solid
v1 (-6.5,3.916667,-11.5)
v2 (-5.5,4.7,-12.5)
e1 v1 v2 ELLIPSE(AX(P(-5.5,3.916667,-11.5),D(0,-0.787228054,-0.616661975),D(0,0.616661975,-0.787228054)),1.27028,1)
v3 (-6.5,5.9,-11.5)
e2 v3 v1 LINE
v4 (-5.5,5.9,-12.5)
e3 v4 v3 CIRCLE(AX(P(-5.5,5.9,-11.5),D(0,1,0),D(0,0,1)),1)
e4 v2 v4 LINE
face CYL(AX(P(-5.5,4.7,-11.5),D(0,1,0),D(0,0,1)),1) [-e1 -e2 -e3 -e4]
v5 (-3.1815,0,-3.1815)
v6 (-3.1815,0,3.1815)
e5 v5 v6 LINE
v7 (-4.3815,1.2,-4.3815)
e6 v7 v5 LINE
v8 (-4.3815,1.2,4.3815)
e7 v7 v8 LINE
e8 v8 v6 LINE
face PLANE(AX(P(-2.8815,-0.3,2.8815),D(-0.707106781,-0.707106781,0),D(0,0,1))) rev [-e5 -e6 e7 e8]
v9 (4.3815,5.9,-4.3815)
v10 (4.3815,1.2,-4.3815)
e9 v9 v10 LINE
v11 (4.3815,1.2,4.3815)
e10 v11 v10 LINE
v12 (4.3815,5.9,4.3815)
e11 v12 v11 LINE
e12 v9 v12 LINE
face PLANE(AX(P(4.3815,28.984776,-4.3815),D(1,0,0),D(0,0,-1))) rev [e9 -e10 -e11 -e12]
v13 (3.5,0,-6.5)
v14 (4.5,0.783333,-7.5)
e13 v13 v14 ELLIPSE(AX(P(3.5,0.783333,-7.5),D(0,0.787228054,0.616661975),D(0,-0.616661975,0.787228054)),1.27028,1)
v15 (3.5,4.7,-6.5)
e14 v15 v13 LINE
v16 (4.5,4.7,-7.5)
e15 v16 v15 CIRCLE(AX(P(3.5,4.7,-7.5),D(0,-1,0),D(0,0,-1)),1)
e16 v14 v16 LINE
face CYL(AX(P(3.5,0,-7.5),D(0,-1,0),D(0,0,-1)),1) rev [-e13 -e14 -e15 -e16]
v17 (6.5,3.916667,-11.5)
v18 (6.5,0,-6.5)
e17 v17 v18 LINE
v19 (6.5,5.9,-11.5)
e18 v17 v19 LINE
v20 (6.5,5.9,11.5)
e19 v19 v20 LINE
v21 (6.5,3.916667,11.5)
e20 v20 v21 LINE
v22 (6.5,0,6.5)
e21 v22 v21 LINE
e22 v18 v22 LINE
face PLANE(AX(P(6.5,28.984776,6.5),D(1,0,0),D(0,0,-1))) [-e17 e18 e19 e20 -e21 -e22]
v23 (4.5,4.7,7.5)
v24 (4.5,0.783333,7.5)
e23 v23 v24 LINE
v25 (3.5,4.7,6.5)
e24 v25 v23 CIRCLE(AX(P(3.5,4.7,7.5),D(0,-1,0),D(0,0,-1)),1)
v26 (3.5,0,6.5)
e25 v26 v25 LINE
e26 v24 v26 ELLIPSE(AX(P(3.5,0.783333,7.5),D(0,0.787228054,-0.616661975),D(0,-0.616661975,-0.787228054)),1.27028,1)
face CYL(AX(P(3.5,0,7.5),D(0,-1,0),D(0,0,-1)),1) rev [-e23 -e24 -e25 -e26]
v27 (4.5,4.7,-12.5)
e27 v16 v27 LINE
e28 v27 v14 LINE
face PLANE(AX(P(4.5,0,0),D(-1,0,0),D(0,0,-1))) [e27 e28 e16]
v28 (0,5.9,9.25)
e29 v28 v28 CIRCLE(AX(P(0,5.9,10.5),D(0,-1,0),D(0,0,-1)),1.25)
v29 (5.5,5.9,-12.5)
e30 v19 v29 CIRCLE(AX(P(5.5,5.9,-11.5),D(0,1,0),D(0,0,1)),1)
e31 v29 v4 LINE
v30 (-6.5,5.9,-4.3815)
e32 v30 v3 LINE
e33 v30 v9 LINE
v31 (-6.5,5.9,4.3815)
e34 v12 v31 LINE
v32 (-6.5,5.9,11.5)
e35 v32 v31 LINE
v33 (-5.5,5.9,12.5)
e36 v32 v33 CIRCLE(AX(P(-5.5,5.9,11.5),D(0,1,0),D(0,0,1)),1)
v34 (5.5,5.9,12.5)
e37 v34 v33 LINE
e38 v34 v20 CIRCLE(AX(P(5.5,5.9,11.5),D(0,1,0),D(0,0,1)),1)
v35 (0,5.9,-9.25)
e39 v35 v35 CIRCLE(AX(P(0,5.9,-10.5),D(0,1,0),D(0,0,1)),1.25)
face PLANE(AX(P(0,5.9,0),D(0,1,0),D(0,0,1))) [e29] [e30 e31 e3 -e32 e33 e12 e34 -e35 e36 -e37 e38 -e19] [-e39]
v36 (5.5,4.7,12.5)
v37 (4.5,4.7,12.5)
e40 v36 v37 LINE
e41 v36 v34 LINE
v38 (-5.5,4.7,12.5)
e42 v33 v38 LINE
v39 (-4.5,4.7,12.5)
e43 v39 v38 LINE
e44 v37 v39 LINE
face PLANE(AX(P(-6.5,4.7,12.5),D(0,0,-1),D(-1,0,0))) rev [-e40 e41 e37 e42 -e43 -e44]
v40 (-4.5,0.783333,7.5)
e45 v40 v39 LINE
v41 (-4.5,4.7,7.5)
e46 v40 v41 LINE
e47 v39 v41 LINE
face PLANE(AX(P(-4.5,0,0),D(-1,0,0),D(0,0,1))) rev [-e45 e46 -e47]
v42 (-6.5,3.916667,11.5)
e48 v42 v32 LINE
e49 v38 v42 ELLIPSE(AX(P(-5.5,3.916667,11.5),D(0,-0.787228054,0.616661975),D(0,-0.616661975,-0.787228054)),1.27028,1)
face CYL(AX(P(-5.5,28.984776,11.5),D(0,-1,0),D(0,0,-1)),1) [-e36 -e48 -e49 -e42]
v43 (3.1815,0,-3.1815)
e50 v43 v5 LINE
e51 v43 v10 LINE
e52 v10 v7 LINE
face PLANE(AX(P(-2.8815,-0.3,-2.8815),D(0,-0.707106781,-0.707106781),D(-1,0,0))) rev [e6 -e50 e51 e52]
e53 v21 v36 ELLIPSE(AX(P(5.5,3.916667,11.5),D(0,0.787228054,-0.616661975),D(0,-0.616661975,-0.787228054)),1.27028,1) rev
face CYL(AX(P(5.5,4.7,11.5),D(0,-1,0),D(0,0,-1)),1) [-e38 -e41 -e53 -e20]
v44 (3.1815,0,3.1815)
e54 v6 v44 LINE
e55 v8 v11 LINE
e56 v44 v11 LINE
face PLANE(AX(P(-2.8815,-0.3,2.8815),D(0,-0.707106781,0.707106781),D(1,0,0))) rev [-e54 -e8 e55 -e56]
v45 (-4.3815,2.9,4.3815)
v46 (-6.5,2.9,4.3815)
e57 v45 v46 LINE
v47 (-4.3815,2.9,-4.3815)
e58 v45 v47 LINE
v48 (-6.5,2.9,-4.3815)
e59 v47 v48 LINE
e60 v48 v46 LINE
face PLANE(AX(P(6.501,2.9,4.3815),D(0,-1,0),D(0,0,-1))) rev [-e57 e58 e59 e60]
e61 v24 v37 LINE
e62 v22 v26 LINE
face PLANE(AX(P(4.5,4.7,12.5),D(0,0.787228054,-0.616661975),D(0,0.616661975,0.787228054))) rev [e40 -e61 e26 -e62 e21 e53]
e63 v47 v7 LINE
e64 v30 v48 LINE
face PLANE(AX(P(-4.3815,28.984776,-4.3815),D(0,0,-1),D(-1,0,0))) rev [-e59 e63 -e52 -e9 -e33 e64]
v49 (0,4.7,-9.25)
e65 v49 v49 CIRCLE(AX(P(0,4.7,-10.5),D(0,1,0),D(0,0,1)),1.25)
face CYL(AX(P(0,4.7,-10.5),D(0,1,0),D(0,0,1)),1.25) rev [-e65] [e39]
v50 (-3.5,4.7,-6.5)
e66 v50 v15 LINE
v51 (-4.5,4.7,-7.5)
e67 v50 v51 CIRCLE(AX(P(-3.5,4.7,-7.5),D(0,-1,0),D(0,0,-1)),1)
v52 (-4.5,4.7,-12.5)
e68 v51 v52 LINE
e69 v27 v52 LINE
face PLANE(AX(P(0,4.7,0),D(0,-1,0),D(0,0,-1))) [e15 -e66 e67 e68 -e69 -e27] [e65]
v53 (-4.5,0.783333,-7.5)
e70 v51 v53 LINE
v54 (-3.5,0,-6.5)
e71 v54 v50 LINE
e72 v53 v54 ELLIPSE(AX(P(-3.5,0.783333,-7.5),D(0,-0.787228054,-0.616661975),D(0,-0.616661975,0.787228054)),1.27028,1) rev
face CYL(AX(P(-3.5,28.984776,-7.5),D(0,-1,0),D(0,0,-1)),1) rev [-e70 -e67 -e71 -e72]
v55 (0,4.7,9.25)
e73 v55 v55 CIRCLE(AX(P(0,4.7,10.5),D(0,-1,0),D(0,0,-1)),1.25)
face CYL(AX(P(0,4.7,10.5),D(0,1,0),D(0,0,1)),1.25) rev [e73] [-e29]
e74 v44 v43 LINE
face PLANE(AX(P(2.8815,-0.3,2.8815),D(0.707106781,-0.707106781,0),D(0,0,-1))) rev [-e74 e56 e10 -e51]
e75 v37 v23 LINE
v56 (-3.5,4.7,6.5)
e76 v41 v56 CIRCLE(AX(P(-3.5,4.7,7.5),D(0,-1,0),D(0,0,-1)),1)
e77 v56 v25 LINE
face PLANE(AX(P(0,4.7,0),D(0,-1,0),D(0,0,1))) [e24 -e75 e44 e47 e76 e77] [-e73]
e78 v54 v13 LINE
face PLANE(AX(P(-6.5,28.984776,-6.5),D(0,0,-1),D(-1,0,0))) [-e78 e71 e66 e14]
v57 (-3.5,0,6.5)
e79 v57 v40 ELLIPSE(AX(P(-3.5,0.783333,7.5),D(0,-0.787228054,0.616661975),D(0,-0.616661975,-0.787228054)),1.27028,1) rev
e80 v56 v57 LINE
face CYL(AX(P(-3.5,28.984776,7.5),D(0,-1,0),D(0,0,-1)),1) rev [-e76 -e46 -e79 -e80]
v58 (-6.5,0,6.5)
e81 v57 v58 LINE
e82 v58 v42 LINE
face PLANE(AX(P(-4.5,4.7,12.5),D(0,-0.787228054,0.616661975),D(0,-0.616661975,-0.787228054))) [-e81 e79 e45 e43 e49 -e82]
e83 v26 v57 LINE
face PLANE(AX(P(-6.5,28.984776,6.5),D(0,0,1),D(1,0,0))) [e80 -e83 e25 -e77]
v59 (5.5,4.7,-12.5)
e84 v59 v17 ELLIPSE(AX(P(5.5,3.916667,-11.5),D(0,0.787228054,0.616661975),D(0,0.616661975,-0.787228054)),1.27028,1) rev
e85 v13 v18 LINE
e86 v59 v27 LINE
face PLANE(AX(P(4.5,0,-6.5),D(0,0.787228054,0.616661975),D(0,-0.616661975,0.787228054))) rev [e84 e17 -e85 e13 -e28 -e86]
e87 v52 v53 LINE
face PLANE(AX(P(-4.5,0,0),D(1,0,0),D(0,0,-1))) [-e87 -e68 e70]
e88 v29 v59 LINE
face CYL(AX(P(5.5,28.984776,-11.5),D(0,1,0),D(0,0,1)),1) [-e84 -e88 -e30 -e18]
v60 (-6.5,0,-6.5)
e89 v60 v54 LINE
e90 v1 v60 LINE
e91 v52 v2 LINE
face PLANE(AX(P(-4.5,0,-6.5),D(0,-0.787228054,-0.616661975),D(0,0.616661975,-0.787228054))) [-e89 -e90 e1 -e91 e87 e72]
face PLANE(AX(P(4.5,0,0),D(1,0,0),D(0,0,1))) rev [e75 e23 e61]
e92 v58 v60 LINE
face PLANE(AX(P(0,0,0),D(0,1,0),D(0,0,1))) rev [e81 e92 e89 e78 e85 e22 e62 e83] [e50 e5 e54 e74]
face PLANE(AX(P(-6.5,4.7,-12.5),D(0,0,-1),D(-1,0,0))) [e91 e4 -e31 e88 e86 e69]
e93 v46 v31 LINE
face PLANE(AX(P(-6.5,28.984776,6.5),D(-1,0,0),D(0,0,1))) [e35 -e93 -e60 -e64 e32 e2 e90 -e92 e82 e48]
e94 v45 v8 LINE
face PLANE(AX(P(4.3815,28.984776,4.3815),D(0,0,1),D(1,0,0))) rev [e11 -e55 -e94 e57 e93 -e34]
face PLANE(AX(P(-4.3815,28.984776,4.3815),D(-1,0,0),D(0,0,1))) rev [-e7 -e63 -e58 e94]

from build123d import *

# Parameters (mm, degrees)
SKETCH1_W           = 8.763
SKETCH1_H           = 8.763
SKETCH1_W_2         = 5.763
SKETCH1_H_2         = 5.763
BOSS_EXTRUDE1_DEPTH = 1.2
SKETCH2_W           = 13
SKETCH2_H           = 13
SKETCH2_W_2         = 8.763
SKETCH2_H_2         = 8.763
BOSS_EXTRUDE3_DEPTH = 5.9
CHAMFER1_SIZE       = 1.5
SKETCH3_W           = 13
SKETCH3_H           = 6
SKETCH3_R           = 1.25
BOSS_EXTRUDE4_DEPTH = 1.2
BOSS_EXTRUDE5_DEPTH = 2
FILLET1_R           = 1
CUT_EXTRUDE1_REACH  = 20.975
SKETCH4_W           = 8.763
SKETCH4_H           = 3


with BuildPart() as part:
    # Sketch1 → Boss-Extrude1 (new body)
    with BuildSketch(Plane(origin=(0, 0, 0), x_dir=(1, 0, 0), z_dir=(0, 1, 0))):
        Rectangle(SKETCH1_W, SKETCH1_H)
        Rectangle(SKETCH1_W_2, SKETCH1_H_2, mode=Mode.SUBTRACT)
    extrude(amount=BOSS_EXTRUDE1_DEPTH)

    # Sketch2 → Boss-Extrude3 (add)
    with BuildSketch(Plane.XZ):
        Rectangle(SKETCH2_W, SKETCH2_H)
        Rectangle(SKETCH2_W_2, SKETCH2_H_2, mode=Mode.SUBTRACT)
    extrude(amount=-BOSS_EXTRUDE3_DEPTH)

    # Chamfer1
    # the kernel refuses this chamfer: 1.5 mm, written as the material it takes off along each edge
    with BuildSketch(Plane(origin=(2.8815, 1.2, -2.8815), x_dir=(0, 0.02749587661058634, -0.9996219169112968), z_dir=(-1, 0, 0))) as chamfer1_piece_1_section:
        Polygon((CHAMFER1_SIZE * 0.999621916911, CHAMFER1_SIZE * 0.0274958766106), (-CHAMFER1_SIZE * 0.0274958766106, CHAMFER1_SIZE * 0.999621916911), (0, 0), align=None)
    chamfer1_piece_1 = extrude(amount=5.763, mode=Mode.PRIVATE)
    chamfer1_piece_1 = split(chamfer1_piece_1, bisect_by=Plane(origin=(0, 0.704393769, -4.3815), z_dir=(0, 0, 1)), keep=Keep.TOP, mode=Mode.PRIVATE)
    add(chamfer1_piece_1, mode=Mode.SUBTRACT)
    with BuildSketch(Plane(origin=(2.8815, 1.2, 2.8815), x_dir=(-0.02749587661058649, -0.9996219169112968, 0), z_dir=(0, 0, -1))) as chamfer1_piece_2_section:
        Polygon((CHAMFER1_SIZE * 0.999621916911, -CHAMFER1_SIZE * 0.0274958766106), (-CHAMFER1_SIZE * 0.0274958766106, -CHAMFER1_SIZE * 0.999621916911), (0, 0), align=None)
    chamfer1_piece_2 = extrude(amount=5.763, mode=Mode.PRIVATE)
    chamfer1_piece_2 = split(chamfer1_piece_2, bisect_by=Plane(origin=(4.3815, 0.704393769, 0), z_dir=(-1, 0, 0)), keep=Keep.TOP, mode=Mode.PRIVATE)
    add(chamfer1_piece_2, mode=Mode.SUBTRACT)
    with BuildSketch(Plane(origin=(-2.8815, 1.2, 2.8815), x_dir=(0, -0.9996219169112968, -0.02749587661058649), z_dir=(1, 0, 0))) as chamfer1_piece_3_section:
        Polygon((CHAMFER1_SIZE * 0.999621916911, -CHAMFER1_SIZE * 0.0274958766106), (-CHAMFER1_SIZE * 0.0274958766106, -CHAMFER1_SIZE * 0.999621916911), (0, 0), align=None)
    chamfer1_piece_3 = extrude(amount=5.763, mode=Mode.PRIVATE)
    chamfer1_piece_3 = split(chamfer1_piece_3, bisect_by=Plane(origin=(0, 0.704393769, 4.3815), z_dir=(0, 0, -1)), keep=Keep.TOP, mode=Mode.PRIVATE)
    add(chamfer1_piece_3, mode=Mode.SUBTRACT)
    with BuildSketch(Plane(origin=(-2.8815, 1.2, -2.8815), x_dir=(0.02749587661058649, -0.9996219169112968, 0), z_dir=(0, 0, 1))) as chamfer1_piece_4_section:
        Polygon((CHAMFER1_SIZE * 0.999621916911, -CHAMFER1_SIZE * 0.0274958766106), (-CHAMFER1_SIZE * 0.0274958766106, -CHAMFER1_SIZE * 0.999621916911), (0, 0), align=None)
    chamfer1_piece_4 = extrude(amount=5.763, mode=Mode.PRIVATE)
    chamfer1_piece_4 = split(chamfer1_piece_4, bisect_by=Plane(origin=(-4.3815, 0.704393769, 0), z_dir=(1, 0, 0)), keep=Keep.TOP, mode=Mode.PRIVATE)
    add(chamfer1_piece_4, mode=Mode.SUBTRACT)
    with BuildSketch(Plane(origin=(2.8815, 1.2, 2.8815), x_dir=(-0.02749587661058649, -0.9996219169112968, 0), z_dir=(0, 0, -1))) as chamfer1_piece_5a_section:
        Polygon((CHAMFER1_SIZE * 0.999621916911, -CHAMFER1_SIZE * 0.0274958766106), (-CHAMFER1_SIZE * 0.0274958766106, -CHAMFER1_SIZE * 0.999621916911), (0, 0), align=None)
    chamfer1_piece_5a = extrude(amount=9.620524482, mode=Mode.PRIVATE)
    chamfer1_piece_5a = split(chamfer1_piece_5a, bisect_by=Plane(origin=(3.374451501, 0.704393769, -2.8815), z_dir=(0, 0, -1)), keep=Keep.TOP, mode=Mode.PRIVATE)
    chamfer1_piece_5a = split(chamfer1_piece_5a, bisect_by=Plane(origin=(3.374451501, 0.704393769, -4.3815), z_dir=(0, 0, 1)), keep=Keep.TOP, mode=Mode.PRIVATE)
    chamfer1_piece_5a = split(chamfer1_piece_5a, bisect_by=Plane(origin=(4.3815, 0.704393769, -3.6315), z_dir=(-1, 0, 0)), keep=Keep.TOP, mode=Mode.PRIVATE)
    with BuildSketch(Plane(origin=(6.739024482, 1.2, -2.8815), x_dir=(0, 0.02749587661058634, -0.9996219169112968), z_dir=(-1, 0, 0))) as chamfer1_piece_5b_section:
        Polygon((CHAMFER1_SIZE * 0.999621916911, CHAMFER1_SIZE * 0.0274958766106), (-CHAMFER1_SIZE * 0.0274958766106, CHAMFER1_SIZE * 0.999621916911), (0, 0), align=None)
    chamfer1_piece_5b = extrude(amount=9.620524482, mode=Mode.PRIVATE)
    chamfer1_piece_5b = split(chamfer1_piece_5b, bisect_by=Plane(origin=(2.8815, 0.704393769, -3.374451501), z_dir=(1, 0, 0)), keep=Keep.TOP, mode=Mode.PRIVATE)
    chamfer1_piece_5b = split(chamfer1_piece_5b, bisect_by=Plane(origin=(3.6315, 0.704393769, -4.3815), z_dir=(0, 0, 1)), keep=Keep.TOP, mode=Mode.PRIVATE)
    chamfer1_piece_5b = split(chamfer1_piece_5b, bisect_by=Plane(origin=(4.3815, 0.704393769, -3.374451501), z_dir=(-1, 0, 0)), keep=Keep.TOP, mode=Mode.PRIVATE)
    chamfer1_piece_5 = chamfer1_piece_5a & chamfer1_piece_5b
    add(chamfer1_piece_5, mode=Mode.SUBTRACT)
    with BuildSketch(Plane(origin=(-2.8815, 1.2, -6.739024482), x_dir=(0.02749587661058649, -0.9996219169112968, 0), z_dir=(0, 0, 1))) as chamfer1_piece_6a_section:
        Polygon((CHAMFER1_SIZE * 0.999621916911, -CHAMFER1_SIZE * 0.0274958766106), (-CHAMFER1_SIZE * 0.0274958766106, -CHAMFER1_SIZE * 0.999621916911), (0, 0), align=None)
    chamfer1_piece_6a = extrude(amount=9.620524482, mode=Mode.PRIVATE)
    chamfer1_piece_6a = split(chamfer1_piece_6a, bisect_by=Plane(origin=(-3.374451501, 0.704393769, -2.8815), z_dir=(0, 0, -1)), keep=Keep.TOP, mode=Mode.PRIVATE)
    chamfer1_piece_6a = split(chamfer1_piece_6a, bisect_by=Plane(origin=(-3.374451501, 0.704393769, -4.3815), z_dir=(0, 0, 1)), keep=Keep.TOP, mode=Mode.PRIVATE)
    chamfer1_piece_6a = split(chamfer1_piece_6a, bisect_by=Plane(origin=(-4.3815, 0.704393769, -3.6315), z_dir=(1, 0, 0)), keep=Keep.TOP, mode=Mode.PRIVATE)
    with BuildSketch(Plane(origin=(2.8815, 1.2, -2.8815), x_dir=(0, 0.02749587661058634, -0.9996219169112968), z_dir=(-1, 0, 0))) as chamfer1_piece_6b_section:
        Polygon((CHAMFER1_SIZE * 0.999621916911, CHAMFER1_SIZE * 0.0274958766106), (-CHAMFER1_SIZE * 0.0274958766106, CHAMFER1_SIZE * 0.999621916911), (0, 0), align=None)
    chamfer1_piece_6b = extrude(amount=9.620524482, mode=Mode.PRIVATE)
    chamfer1_piece_6b = split(chamfer1_piece_6b, bisect_by=Plane(origin=(-2.8815, 0.704393769, -3.374451501), z_dir=(-1, 0, 0)), keep=Keep.TOP, mode=Mode.PRIVATE)
    chamfer1_piece_6b = split(chamfer1_piece_6b, bisect_by=Plane(origin=(-3.6315, 0.704393769, -4.3815), z_dir=(0, 0, 1)), keep=Keep.TOP, mode=Mode.PRIVATE)
    chamfer1_piece_6b = split(chamfer1_piece_6b, bisect_by=Plane(origin=(-4.3815, 0.704393769, -3.374451501), z_dir=(1, 0, 0)), keep=Keep.TOP, mode=Mode.PRIVATE)
    chamfer1_piece_6 = chamfer1_piece_6a & chamfer1_piece_6b
    add(chamfer1_piece_6, mode=Mode.SUBTRACT)
    with BuildSketch(Plane(origin=(-2.8815, 1.2, 2.8815), x_dir=(0, -0.9996219169112968, -0.02749587661058649), z_dir=(1, 0, 0))) as chamfer1_piece_7a_section:
        Polygon((CHAMFER1_SIZE * 0.999621916911, -CHAMFER1_SIZE * 0.0274958766106), (-CHAMFER1_SIZE * 0.0274958766106, -CHAMFER1_SIZE * 0.999621916911), (0, 0), align=None)
    chamfer1_piece_7a = extrude(amount=9.620524482, mode=Mode.PRIVATE)
    chamfer1_piece_7a = split(chamfer1_piece_7a, bisect_by=Plane(origin=(2.8815, 0.704393769, 3.374451501), z_dir=(1, 0, 0)), keep=Keep.TOP, mode=Mode.PRIVATE)
    chamfer1_piece_7a = split(chamfer1_piece_7a, bisect_by=Plane(origin=(4.3815, 0.704393769, 3.374451501), z_dir=(-1, 0, 0)), keep=Keep.TOP, mode=Mode.PRIVATE)
    chamfer1_piece_7a = split(chamfer1_piece_7a, bisect_by=Plane(origin=(3.6315, 0.704393769, 4.3815), z_dir=(0, 0, -1)), keep=Keep.TOP, mode=Mode.PRIVATE)
    with BuildSketch(Plane(origin=(2.8815, 1.2, 6.739024482), x_dir=(-0.02749587661058649, -0.9996219169112968, 0), z_dir=(0, 0, -1))) as chamfer1_piece_7b_section:
        Polygon((CHAMFER1_SIZE * 0.999621916911, -CHAMFER1_SIZE * 0.0274958766106), (-CHAMFER1_SIZE * 0.0274958766106, -CHAMFER1_SIZE * 0.999621916911), (0, 0), align=None)
    chamfer1_piece_7b = extrude(amount=9.620524482, mode=Mode.PRIVATE)
    chamfer1_piece_7b = split(chamfer1_piece_7b, bisect_by=Plane(origin=(3.374451501, 0.704393769, 2.8815), z_dir=(0, 0, 1)), keep=Keep.TOP, mode=Mode.PRIVATE)
    chamfer1_piece_7b = split(chamfer1_piece_7b, bisect_by=Plane(origin=(4.3815, 0.704393769, 3.6315), z_dir=(-1, 0, 0)), keep=Keep.TOP, mode=Mode.PRIVATE)
    chamfer1_piece_7b = split(chamfer1_piece_7b, bisect_by=Plane(origin=(3.374451501, 0.704393769, 4.3815), z_dir=(0, 0, -1)), keep=Keep.TOP, mode=Mode.PRIVATE)
    chamfer1_piece_7 = chamfer1_piece_7a & chamfer1_piece_7b
    add(chamfer1_piece_7, mode=Mode.SUBTRACT)
    with BuildSketch(Plane(origin=(-6.739024482, 1.2, 2.8815), x_dir=(0, -0.9996219169112968, -0.02749587661058649), z_dir=(1, 0, 0))) as chamfer1_piece_8a_section:
        Polygon((CHAMFER1_SIZE * 0.999621916911, -CHAMFER1_SIZE * 0.0274958766106), (-CHAMFER1_SIZE * 0.0274958766106, -CHAMFER1_SIZE * 0.999621916911), (0, 0), align=None)
    chamfer1_piece_8a = extrude(amount=9.620524482, mode=Mode.PRIVATE)
    chamfer1_piece_8a = split(chamfer1_piece_8a, bisect_by=Plane(origin=(-2.8815, 0.704393769, 3.374451501), z_dir=(-1, 0, 0)), keep=Keep.TOP, mode=Mode.PRIVATE)
    chamfer1_piece_8a = split(chamfer1_piece_8a, bisect_by=Plane(origin=(-3.6315, 0.704393769, 4.3815), z_dir=(0, 0, -1)), keep=Keep.TOP, mode=Mode.PRIVATE)
    chamfer1_piece_8a = split(chamfer1_piece_8a, bisect_by=Plane(origin=(-4.3815, 0.704393769, 3.374451501), z_dir=(1, 0, 0)), keep=Keep.TOP, mode=Mode.PRIVATE)
    with BuildSketch(Plane(origin=(-2.8815, 1.2, -2.8815), x_dir=(0.02749587661058649, -0.9996219169112968, 0), z_dir=(0, 0, 1))) as chamfer1_piece_8b_section:
        Polygon((CHAMFER1_SIZE * 0.999621916911, -CHAMFER1_SIZE * 0.0274958766106), (-CHAMFER1_SIZE * 0.0274958766106, -CHAMFER1_SIZE * 0.999621916911), (0, 0), align=None)
    chamfer1_piece_8b = extrude(amount=9.620524482, mode=Mode.PRIVATE)
    chamfer1_piece_8b = split(chamfer1_piece_8b, bisect_by=Plane(origin=(-3.374451501, 0.704393769, 2.8815), z_dir=(0, 0, 1)), keep=Keep.TOP, mode=Mode.PRIVATE)
    chamfer1_piece_8b = split(chamfer1_piece_8b, bisect_by=Plane(origin=(-3.374451501, 0.704393769, 4.3815), z_dir=(0, 0, -1)), keep=Keep.TOP, mode=Mode.PRIVATE)
    chamfer1_piece_8b = split(chamfer1_piece_8b, bisect_by=Plane(origin=(-4.3815, 0.704393769, 3.6315), z_dir=(1, 0, 0)), keep=Keep.TOP, mode=Mode.PRIVATE)
    chamfer1_piece_8 = chamfer1_piece_8a & chamfer1_piece_8b
    add(chamfer1_piece_8, mode=Mode.SUBTRACT)

    # Sketch3 → Boss-Extrude4 (add)
    with BuildSketch(Plane(origin=(0, 5.9, 0), x_dir=(1, 0, 0), z_dir=(0, 1, 0))):
        with Locations((0, 9.5)):
            Rectangle(SKETCH3_W, SKETCH3_H)
        with Locations(Location((0, 10.5, 0), (0, 0, 270))):
            Circle(SKETCH3_R, mode=Mode.SUBTRACT)
    boss_extrude4 = extrude(amount=-BOSS_EXTRUDE4_DEPTH)

    # Mirror1: Boss-Extrude4 across plane
    add(boss_extrude4.mirror(Plane.XY))

    # Sketch5 → Boss-Extrude5 (add)
    with BuildSketch(Plane.ZY.offset(6.5)):
        Polygon((6.5, 4.7), (6.5, 0), (12.5, 4.7), align=None)
        Polygon((-6.5, 4.7), (-6.5, 0), (-12.5, 4.7), align=None)
    boss_extrude5 = extrude(amount=-BOSS_EXTRUDE5_DEPTH)

    # Mirror2: Boss-Extrude5 across plane
    add(boss_extrude5.mirror(Plane(origin=(0, 0, 0), x_dir=(0, 0, 1), z_dir=(1, 0, 0))))

    # Fillet1
    fillet1_edges = [part.edges().sort_by_distance(p)[0] for p in [
        (-4.5, 2.35, -6.5),
        (4.5, 2.35, 6.5),
        (4.5, 2.35, -6.5),
        (-6.5, 5.3, -12.5),
        (6.5, 5.3, -12.5),
        (-6.5, 5.3, 12.5),
        (6.5, 5.3, 12.5),
        (-4.5, 2.35, 6.5),
    ]]
    fillet(fillet1_edges, radius=FILLET1_R)

    # Sketch4 → Cut-Extrude1 (cut, up to next)
    with BuildSketch(Plane.ZY.offset(6.5), mode=Mode.PRIVATE) as cut_extrude1_sk1:
        with Locations((0, 4.4)):
            Rectangle(SKETCH4_W, SKETCH4_H)
    cut_extrude1_tool1 = extrude(cut_extrude1_sk1.sketch, amount=-CUT_EXTRUDE1_REACH, mode=Mode.PRIVATE) & part.part
    add(cut_extrude1_tool1.solids().sort_by_distance((-6.5, 4.4, 0))[0], mode=Mode.SUBTRACT)


solid = part.part
